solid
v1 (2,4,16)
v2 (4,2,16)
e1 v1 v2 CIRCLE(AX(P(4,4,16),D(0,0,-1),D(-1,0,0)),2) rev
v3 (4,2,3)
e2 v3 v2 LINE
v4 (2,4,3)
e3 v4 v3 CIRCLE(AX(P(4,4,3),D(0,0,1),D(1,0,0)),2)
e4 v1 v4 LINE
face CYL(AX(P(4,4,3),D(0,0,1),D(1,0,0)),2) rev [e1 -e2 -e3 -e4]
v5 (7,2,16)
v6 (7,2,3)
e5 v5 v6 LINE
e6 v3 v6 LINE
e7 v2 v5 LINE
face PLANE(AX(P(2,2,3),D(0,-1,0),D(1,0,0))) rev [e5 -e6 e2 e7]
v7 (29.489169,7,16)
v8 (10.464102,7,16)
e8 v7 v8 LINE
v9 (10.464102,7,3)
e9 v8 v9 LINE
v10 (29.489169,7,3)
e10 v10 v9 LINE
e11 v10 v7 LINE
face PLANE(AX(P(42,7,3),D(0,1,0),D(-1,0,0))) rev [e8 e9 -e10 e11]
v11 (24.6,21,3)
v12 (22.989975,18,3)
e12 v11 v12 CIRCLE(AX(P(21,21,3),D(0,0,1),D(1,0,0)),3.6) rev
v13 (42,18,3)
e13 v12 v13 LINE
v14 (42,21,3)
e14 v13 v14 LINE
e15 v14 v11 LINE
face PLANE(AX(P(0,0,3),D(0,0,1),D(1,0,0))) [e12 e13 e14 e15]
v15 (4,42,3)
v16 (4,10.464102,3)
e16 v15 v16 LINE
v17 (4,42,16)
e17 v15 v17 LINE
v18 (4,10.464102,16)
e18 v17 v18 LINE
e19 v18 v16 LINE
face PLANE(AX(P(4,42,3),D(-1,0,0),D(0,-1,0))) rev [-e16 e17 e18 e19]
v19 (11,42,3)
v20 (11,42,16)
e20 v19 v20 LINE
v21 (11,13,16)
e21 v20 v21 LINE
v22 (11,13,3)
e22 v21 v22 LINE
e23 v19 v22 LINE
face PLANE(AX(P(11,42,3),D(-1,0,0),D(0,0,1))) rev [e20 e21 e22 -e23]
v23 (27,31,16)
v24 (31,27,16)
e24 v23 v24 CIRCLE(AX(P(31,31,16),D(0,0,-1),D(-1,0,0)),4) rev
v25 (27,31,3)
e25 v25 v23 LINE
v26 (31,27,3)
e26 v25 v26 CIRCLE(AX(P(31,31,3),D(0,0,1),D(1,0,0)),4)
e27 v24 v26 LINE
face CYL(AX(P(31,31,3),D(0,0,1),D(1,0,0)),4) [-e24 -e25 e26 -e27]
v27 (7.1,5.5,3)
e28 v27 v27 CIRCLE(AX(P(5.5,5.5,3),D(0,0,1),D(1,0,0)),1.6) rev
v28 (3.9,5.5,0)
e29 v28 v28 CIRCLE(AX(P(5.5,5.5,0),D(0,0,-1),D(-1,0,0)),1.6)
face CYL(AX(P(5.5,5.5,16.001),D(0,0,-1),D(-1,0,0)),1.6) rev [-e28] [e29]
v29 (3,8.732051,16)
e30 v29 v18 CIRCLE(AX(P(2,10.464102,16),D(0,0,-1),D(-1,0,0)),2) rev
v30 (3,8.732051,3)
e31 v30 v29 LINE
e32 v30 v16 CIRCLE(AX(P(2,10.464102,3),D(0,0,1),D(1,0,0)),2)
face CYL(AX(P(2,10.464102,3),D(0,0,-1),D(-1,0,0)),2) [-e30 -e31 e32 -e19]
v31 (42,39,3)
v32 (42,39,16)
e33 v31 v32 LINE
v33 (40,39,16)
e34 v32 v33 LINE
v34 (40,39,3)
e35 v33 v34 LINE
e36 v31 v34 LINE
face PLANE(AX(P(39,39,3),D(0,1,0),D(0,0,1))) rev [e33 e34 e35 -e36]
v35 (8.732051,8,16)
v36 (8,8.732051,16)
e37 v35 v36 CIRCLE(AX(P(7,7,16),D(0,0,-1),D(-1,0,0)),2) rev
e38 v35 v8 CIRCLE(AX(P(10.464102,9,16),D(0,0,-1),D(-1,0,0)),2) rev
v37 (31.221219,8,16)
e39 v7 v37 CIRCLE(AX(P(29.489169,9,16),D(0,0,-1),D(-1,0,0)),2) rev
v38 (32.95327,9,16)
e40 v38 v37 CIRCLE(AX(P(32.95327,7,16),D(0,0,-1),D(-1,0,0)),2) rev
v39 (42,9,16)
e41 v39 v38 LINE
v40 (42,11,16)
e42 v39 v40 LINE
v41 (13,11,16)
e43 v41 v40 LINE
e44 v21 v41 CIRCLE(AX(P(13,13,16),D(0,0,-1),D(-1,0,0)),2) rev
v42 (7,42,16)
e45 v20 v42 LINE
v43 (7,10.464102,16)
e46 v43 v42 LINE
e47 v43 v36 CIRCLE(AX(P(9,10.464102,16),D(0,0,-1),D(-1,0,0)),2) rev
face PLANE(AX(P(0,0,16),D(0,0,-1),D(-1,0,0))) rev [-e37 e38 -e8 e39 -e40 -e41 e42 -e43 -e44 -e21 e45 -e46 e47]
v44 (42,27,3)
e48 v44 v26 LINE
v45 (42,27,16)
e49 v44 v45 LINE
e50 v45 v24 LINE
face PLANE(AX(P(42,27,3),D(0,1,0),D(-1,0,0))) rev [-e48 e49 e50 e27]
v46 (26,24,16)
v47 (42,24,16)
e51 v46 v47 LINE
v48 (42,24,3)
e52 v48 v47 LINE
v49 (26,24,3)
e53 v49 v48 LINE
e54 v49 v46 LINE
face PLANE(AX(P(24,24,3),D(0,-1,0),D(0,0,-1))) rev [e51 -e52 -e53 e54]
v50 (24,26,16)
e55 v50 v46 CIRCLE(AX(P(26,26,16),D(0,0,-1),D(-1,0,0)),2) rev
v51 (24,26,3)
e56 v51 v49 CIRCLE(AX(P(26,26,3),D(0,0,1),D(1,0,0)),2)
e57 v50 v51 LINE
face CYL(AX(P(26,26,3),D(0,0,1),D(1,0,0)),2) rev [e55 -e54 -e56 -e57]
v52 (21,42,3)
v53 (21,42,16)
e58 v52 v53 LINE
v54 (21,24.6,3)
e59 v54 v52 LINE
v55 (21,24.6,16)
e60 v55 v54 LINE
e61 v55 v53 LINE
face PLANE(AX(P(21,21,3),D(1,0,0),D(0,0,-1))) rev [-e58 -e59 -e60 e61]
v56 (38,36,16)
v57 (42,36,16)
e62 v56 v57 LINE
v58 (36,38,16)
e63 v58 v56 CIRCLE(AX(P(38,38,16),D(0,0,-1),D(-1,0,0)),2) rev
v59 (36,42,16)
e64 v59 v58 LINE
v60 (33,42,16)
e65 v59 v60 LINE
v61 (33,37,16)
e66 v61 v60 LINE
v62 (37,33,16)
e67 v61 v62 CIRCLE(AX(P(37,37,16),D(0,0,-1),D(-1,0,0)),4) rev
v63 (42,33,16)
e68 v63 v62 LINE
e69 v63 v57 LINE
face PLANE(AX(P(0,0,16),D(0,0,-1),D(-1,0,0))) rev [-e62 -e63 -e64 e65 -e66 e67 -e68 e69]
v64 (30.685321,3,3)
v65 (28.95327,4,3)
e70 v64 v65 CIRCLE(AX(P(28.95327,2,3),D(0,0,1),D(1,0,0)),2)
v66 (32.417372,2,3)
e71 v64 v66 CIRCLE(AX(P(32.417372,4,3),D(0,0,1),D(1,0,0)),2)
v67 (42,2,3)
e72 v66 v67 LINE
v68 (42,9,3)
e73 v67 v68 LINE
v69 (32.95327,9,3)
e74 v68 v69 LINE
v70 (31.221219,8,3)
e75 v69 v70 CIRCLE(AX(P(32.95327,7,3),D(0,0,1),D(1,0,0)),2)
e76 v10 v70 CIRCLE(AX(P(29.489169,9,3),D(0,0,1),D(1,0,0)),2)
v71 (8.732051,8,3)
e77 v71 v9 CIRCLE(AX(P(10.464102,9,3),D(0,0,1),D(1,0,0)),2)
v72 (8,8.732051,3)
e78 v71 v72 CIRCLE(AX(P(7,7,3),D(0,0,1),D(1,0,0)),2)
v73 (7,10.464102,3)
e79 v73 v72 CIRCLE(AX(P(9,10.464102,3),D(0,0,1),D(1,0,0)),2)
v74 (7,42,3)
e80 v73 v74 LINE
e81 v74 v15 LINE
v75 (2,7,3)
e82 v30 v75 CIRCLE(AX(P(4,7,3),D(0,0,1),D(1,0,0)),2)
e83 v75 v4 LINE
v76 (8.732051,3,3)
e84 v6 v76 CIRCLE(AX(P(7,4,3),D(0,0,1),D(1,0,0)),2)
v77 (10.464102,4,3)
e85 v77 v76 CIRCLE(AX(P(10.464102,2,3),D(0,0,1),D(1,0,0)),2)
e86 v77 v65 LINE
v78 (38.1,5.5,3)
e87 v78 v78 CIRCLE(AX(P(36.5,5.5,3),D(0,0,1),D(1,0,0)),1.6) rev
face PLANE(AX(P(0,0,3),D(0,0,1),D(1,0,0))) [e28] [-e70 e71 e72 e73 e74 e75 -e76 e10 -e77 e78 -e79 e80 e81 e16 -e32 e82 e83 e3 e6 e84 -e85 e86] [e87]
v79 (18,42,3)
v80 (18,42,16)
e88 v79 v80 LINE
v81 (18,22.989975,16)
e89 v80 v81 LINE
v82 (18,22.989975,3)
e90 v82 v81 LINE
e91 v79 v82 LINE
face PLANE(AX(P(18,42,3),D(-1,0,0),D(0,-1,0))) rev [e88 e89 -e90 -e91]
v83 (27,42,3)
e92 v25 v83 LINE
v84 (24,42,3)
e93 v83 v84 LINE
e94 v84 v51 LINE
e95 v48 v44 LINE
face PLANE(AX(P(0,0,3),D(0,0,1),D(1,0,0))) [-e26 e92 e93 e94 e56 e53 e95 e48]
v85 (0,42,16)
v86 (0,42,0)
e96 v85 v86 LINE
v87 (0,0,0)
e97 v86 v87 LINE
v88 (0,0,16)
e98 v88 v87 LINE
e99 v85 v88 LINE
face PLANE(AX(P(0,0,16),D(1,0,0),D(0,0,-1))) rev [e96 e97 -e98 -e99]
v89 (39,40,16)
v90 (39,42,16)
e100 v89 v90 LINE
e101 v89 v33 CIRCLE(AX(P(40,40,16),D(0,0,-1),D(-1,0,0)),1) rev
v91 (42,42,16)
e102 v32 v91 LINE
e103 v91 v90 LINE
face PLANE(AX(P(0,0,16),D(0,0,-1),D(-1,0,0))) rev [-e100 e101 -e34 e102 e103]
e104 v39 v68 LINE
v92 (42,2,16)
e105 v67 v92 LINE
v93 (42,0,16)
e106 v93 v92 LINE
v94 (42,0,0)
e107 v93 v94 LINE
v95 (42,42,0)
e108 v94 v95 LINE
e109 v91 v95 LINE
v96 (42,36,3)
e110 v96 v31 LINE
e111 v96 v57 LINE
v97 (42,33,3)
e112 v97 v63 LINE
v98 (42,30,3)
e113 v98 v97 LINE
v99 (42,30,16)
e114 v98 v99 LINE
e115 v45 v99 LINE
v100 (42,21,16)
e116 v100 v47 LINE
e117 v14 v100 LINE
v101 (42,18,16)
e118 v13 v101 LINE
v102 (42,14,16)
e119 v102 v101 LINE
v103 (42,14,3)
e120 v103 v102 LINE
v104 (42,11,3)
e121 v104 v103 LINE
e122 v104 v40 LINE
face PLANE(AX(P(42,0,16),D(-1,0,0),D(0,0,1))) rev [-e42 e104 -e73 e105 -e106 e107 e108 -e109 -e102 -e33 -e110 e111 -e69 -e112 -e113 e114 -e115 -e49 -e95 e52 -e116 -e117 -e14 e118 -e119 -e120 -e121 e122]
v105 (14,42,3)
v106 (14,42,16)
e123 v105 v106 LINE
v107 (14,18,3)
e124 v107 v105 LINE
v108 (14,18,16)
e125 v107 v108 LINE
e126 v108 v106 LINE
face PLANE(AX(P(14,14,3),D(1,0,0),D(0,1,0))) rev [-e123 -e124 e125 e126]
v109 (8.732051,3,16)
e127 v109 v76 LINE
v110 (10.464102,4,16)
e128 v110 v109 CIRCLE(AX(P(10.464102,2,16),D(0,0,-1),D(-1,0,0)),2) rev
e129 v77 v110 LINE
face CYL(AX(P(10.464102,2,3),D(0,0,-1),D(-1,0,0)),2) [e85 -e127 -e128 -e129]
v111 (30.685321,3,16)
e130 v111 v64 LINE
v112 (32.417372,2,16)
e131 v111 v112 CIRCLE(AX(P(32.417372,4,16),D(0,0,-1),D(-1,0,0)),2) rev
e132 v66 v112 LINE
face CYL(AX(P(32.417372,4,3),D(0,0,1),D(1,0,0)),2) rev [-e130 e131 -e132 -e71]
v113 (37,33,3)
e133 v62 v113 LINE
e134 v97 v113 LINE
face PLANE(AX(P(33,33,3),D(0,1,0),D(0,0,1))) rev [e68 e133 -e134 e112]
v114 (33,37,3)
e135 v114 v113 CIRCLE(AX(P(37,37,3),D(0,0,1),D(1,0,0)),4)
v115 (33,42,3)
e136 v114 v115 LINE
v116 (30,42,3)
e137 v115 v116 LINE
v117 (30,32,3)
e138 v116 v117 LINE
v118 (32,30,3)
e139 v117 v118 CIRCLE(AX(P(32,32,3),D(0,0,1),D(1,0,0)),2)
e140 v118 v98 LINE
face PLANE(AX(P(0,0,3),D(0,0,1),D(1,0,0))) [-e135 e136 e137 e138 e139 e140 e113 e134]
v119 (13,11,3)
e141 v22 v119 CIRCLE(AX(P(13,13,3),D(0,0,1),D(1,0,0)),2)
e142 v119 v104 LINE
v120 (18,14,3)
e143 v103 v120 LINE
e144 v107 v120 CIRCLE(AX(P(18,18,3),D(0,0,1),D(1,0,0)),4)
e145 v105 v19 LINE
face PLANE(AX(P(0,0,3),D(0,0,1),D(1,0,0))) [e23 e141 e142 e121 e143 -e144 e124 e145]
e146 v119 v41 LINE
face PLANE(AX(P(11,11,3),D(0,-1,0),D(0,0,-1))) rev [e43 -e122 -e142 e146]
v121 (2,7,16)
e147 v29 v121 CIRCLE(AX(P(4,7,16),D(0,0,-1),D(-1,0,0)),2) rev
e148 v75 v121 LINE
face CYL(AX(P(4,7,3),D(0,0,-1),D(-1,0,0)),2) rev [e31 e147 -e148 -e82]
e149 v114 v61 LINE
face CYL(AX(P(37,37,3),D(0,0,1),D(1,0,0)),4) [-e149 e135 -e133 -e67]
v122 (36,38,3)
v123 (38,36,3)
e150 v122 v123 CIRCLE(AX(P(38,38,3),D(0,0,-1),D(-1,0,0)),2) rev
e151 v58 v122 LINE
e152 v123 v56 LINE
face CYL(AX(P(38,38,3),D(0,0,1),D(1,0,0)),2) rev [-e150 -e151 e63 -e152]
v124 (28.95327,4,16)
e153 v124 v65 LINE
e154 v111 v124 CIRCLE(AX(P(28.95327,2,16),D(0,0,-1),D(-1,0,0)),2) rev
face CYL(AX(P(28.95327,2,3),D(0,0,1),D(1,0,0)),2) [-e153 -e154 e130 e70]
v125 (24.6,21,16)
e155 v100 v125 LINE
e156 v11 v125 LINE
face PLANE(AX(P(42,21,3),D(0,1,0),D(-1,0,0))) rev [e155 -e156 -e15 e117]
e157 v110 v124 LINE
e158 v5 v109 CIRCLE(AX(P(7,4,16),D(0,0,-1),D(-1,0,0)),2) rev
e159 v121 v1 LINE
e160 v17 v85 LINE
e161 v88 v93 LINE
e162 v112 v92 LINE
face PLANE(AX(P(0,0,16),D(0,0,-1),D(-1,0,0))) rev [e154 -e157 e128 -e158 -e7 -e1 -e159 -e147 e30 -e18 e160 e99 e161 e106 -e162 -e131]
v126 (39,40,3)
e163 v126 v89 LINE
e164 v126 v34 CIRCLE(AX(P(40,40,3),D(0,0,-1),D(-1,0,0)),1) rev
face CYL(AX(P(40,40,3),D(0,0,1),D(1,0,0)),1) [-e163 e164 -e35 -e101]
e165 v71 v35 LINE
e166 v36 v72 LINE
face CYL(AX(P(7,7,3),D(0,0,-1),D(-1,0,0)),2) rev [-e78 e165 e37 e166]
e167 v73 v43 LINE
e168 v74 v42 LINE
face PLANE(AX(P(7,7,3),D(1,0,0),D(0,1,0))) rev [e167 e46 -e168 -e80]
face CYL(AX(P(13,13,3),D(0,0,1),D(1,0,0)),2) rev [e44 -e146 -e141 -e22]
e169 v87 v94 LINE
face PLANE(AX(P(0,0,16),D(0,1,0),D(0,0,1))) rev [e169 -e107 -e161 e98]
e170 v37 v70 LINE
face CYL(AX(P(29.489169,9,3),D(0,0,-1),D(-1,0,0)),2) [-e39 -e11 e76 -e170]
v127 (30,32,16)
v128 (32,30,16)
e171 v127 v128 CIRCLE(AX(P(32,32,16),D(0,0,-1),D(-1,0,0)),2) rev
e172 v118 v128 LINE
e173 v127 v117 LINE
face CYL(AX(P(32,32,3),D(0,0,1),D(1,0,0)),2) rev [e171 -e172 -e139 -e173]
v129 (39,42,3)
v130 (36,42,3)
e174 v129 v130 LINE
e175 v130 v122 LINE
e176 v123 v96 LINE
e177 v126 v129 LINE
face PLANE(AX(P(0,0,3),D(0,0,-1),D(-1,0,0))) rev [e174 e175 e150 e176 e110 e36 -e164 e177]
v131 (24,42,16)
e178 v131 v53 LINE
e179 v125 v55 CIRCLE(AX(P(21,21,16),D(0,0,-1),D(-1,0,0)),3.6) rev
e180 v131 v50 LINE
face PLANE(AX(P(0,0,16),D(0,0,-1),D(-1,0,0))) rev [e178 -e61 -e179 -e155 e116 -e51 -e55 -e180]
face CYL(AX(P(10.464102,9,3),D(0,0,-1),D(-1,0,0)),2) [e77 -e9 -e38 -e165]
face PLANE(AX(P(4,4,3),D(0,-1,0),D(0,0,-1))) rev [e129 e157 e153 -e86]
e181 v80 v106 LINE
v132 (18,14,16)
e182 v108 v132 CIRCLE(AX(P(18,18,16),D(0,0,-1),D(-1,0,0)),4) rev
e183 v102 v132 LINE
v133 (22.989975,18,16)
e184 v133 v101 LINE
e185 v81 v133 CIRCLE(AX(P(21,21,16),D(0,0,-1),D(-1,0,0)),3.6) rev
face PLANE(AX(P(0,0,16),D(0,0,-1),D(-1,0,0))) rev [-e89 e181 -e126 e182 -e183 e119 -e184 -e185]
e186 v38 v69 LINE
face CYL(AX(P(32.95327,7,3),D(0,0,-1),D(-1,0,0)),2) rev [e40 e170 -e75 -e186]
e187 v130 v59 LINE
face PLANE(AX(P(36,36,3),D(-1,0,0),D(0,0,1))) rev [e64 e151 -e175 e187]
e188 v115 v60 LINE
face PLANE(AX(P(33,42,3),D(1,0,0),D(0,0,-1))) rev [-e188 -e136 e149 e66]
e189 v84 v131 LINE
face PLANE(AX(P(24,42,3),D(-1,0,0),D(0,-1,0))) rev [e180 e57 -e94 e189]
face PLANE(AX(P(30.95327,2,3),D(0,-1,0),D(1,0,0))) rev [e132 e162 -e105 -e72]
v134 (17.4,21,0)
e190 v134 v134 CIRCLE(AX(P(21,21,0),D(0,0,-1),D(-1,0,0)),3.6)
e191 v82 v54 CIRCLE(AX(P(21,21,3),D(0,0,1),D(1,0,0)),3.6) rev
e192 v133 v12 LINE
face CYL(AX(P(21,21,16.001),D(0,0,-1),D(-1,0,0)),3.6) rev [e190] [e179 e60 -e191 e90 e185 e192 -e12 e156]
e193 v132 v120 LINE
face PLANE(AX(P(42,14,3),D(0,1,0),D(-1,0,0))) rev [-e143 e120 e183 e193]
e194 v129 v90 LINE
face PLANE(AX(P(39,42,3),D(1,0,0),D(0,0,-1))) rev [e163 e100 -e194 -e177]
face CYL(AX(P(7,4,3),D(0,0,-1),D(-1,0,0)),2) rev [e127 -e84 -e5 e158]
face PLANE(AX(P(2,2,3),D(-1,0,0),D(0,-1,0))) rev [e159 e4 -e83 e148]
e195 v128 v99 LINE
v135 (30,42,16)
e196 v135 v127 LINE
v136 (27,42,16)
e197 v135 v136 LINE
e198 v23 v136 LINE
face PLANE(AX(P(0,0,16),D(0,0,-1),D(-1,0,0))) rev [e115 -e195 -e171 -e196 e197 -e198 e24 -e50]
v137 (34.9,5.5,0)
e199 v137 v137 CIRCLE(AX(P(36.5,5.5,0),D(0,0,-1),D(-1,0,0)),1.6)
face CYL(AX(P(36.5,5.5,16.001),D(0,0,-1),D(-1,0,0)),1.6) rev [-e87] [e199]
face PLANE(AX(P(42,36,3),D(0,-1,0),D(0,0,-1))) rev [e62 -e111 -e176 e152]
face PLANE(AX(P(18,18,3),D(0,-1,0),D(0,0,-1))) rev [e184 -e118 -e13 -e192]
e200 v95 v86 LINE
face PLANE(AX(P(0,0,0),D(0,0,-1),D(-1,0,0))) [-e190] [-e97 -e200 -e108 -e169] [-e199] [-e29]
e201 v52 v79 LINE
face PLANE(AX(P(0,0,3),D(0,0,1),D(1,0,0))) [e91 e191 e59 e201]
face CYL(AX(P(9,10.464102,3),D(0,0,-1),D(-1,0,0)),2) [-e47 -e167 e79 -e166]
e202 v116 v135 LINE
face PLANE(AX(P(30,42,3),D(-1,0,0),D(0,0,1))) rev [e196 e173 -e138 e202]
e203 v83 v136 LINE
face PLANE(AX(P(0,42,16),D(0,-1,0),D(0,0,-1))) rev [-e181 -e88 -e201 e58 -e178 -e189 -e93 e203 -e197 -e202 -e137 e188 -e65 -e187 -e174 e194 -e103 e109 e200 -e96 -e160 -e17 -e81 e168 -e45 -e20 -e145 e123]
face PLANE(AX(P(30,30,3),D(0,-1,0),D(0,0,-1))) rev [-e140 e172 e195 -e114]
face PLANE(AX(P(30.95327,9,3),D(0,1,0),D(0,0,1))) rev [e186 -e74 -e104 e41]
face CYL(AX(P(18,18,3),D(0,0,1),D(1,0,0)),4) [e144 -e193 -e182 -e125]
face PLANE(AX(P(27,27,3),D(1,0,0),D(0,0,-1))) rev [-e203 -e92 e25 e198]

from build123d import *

# Parameters (mm, degrees)
SKETCH1_W           = 42
SKETCH1_H           = 42
BOSS_EXTRUDE1_DEPTH = 16
CUT_EXTRUDE2_DEPTH  = 13
FILLET2_R           = 1
FILLET3_R           = 4
FILLET4_R           = 4
FILLET6_R           = 4
FILLET8_R           = 2
FILLET9_R           = 2
FILLET11_R          = 2
FILLET12_R          = 2
FILLET13_R          = 2
CUT_EXTRUDE3_REACH  = 63.514
SKETCH4_R           = 1.6
SKETCH4_R_2         = 3.6
SKETCH5_W           = 11.093459678
SKETCH5_H           = 7
SKETCH5_W_2         = 7
CUT_EXTRUDE14_DEPTH = 13
FILLET14_R          = 2
FILLET15_R          = 2
FILLET16_R          = 2
FILLET17_R          = 2
FILLET18_R          = 2
FILLET19_R          = 2
FILLET20_R          = 2
FILLET21_R          = 2
FILLET22_R          = 2
FILLET23_R          = 2
FILLET24_R          = 2
FILLET25_R          = 2
FILLET26_R          = 2


with BuildPart() as part:
    # Sketch1 → Boss-Extrude1 (new body)
    with BuildSketch(Plane.XY):
        with Locations((21, 21)):
            Rectangle(SKETCH1_W, SKETCH1_H)
    extrude(amount=BOSS_EXTRUDE1_DEPTH)

    # Sketch3 → Cut-Extrude2 (cut)
    with BuildSketch(Plane.XY.offset(16)):
        Polygon((39, 42), (39, 39), (42, 39), (42, 36), (36, 36), (36, 42), align=None)
        Polygon((33, 42), (33, 33), (42, 33), (42, 30), (30, 30), (30, 42), align=None)
        Polygon((42, 27), (27, 27), (27, 42), (24, 42), (24, 24), (42, 24), align=None)
        Polygon((42, 21), (21, 21), (21, 42), (18, 42), (18, 18), (42, 18), align=None)
        Polygon((42, 14), (14, 14), (14, 42), (11, 42), (11, 11), (42, 11), align=None)
        Polygon((42, 7), (7, 7), (7, 42), (4, 42), (4, 4), (42, 4), align=None)
    extrude(amount=-CUT_EXTRUDE2_DEPTH, mode=Mode.SUBTRACT)

    # Fillet2
    fillet2_edges = [part.edges().sort_by_distance(p)[0] for p in [
        (39, 39, 9.5),
    ]]
    fillet(fillet2_edges, radius=FILLET2_R)

    # Fillet3
    fillet3_edges = [part.edges().sort_by_distance(p)[0] for p in [
        (33, 33, 9.5),
    ]]
    fillet(fillet3_edges, radius=FILLET3_R)

    # Fillet4
    fillet4_edges = [part.edges().sort_by_distance(p)[0] for p in [
        (27, 27, 9.5),
    ]]
    fillet(fillet4_edges, radius=FILLET4_R)

    # Fillet6
    fillet6_edges = [part.edges().sort_by_distance(p)[0] for p in [
        (14, 14, 9.5),
    ]]
    fillet(fillet6_edges, radius=FILLET6_R)

    # Fillet8
    fillet8_edges = [part.edges().sort_by_distance(p)[0] for p in [
        (36, 36, 9.5),
    ]]
    fillet(fillet8_edges, radius=FILLET8_R)

    # Fillet9
    fillet9_edges = [part.edges().sort_by_distance(p)[0] for p in [
        (30, 30, 9.5),
    ]]
    fillet(fillet9_edges, radius=FILLET9_R)

    # Fillet11
    fillet11_edges = [part.edges().sort_by_distance(p)[0] for p in [
        (18, 18, 9.5),
    ]]
    fillet(fillet11_edges, radius=FILLET11_R)

    # Fillet12
    fillet12_edges = [part.edges().sort_by_distance(p)[0] for p in [
        (11, 11, 9.5),
    ]]
    fillet(fillet12_edges, radius=FILLET12_R)

    # Fillet13
    fillet13_edges = [part.edges().sort_by_distance(p)[0] for p in [
        (4, 4, 9.5),
    ]]
    fillet(fillet13_edges, radius=FILLET13_R)

    # Sketch4 → Cut-Extrude3 (cut, up to next)
    with BuildSketch(Plane(origin=(0, 0, 0), x_dir=(-1, 0, 0), z_dir=(0, 0, -1)), mode=Mode.PRIVATE) as cut_extrude3_sk1:
        with Locations((-36.5, 5.5)):
            Circle(SKETCH4_R)
    cut_extrude3_tool1 = extrude(cut_extrude3_sk1.sketch, amount=-CUT_EXTRUDE3_REACH, mode=Mode.PRIVATE) & part.part
    # Sketch4 → Cut-Extrude3 (cut, up to next)
    with BuildSketch(Plane(origin=(0, 0, 0), x_dir=(-1, 0, 0), z_dir=(0, 0, -1)), mode=Mode.PRIVATE) as cut_extrude3_sk2:
        with Locations((-5.5, 5.5)):
            Circle(SKETCH4_R)
    cut_extrude3_tool2 = extrude(cut_extrude3_sk2.sketch, amount=-CUT_EXTRUDE3_REACH, mode=Mode.PRIVATE) & part.part
    # Sketch4 → Cut-Extrude3 (cut, up to next)
    with BuildSketch(Plane(origin=(0, 0, 0), x_dir=(-1, 0, 0), z_dir=(0, 0, -1)), mode=Mode.PRIVATE) as cut_extrude3_sk3:
        with Locations((-21, 21)):
            Circle(SKETCH4_R_2)
    cut_extrude3_tool3 = extrude(cut_extrude3_sk3.sketch, amount=-CUT_EXTRUDE3_REACH, mode=Mode.PRIVATE) & part.part
    add(cut_extrude3_tool1.solids().sort_by_distance((36.5, 5.5, 0))[0], mode=Mode.SUBTRACT)
    add(cut_extrude3_tool2.solids().sort_by_distance((5.5, 5.5, 0))[0], mode=Mode.SUBTRACT)
    add(cut_extrude3_tool3.solids().sort_by_distance((21, 21, 0))[0], mode=Mode.SUBTRACT)

    # Sketch5 → Cut-Extrude14 (cut)
    with BuildSketch(Plane.XY.offset(16)):
        with Locations((36.5, 5.5)):
            Rectangle(SKETCH5_W, SKETCH5_H)
        with Locations((5.5, 5.5)):
            Rectangle(SKETCH5_W_2, SKETCH5_H)
    extrude(amount=-CUT_EXTRUDE14_DEPTH, mode=Mode.SUBTRACT)

    # Fillet14
    fillet14_edges = [part.edges().sort_by_distance(p)[0] for p in [
        (24, 24, 9.5),
    ]]
    fillet(fillet14_edges, radius=FILLET14_R)

    # Fillet15
    fillet15_edges = [part.edges().sort_by_distance(p)[0] for p in [
        (9, 2, 9.5),
    ]]
    fillet(fillet15_edges, radius=FILLET15_R - 0.0001)  # a hair under: the kernel refuses the full size

    # Fillet16
    fillet16_edges = [part.edges().sort_by_distance(p)[0] for p in [
        (2, 2, 9.5),
    ]]
    fillet(fillet16_edges, radius=FILLET16_R)

    # Fillet17
    fillet17_edges = [part.edges().sort_by_distance(p)[0] for p in [
        (2, 9, 9.5),
    ]]
    fillet(fillet17_edges, radius=FILLET17_R - 0.0001)  # a hair under: the kernel refuses the full size

    # Fillet18
    fillet18_edges = [part.edges().sort_by_distance(p)[0] for p in [
        (9, 9, 9.5),
    ]]
    fillet(fillet18_edges, radius=FILLET18_R - 0.0001)  # a hair under: the kernel refuses the full size

    # Fillet19
    fillet19_edges = [part.edges().sort_by_distance(p)[0] for p in [
        (4, 9, 9.5),
    ]]
    fillet(fillet19_edges, radius=FILLET19_R)

    # Fillet20
    fillet20_edges = [part.edges().sort_by_distance(p)[0] for p in [
        (7, 9, 9.5),
    ]]
    fillet(fillet20_edges, radius=FILLET20_R)

    # Fillet21
    fillet21_edges = [part.edges().sort_by_distance(p)[0] for p in [
        (9, 7, 9.5),
    ]]
    fillet(fillet21_edges, radius=FILLET21_R)

    # Fillet22
    fillet22_edges = [part.edges().sort_by_distance(p)[0] for p in [
        (9, 4, 9.5),
    ]]
    fillet(fillet22_edges, radius=FILLET22_R)

    # Fillet23
    fillet23_edges = [part.edges().sort_by_distance(p)[0] for p in [
        (30.953270161, 9, 9.5),
    ]]
    fillet(fillet23_edges, radius=FILLET23_R - 0.0001)  # a hair under: the kernel refuses the full size

    # Fillet24
    fillet24_edges = [part.edges().sort_by_distance(p)[0] for p in [
        (30.953270161, 7, 9.5),
    ]]
    fillet(fillet24_edges, radius=FILLET24_R)

    # Fillet25
    fillet25_edges = [part.edges().sort_by_distance(p)[0] for p in [
        (30.953270161, 4, 9.5),
    ]]
    fillet(fillet25_edges, radius=FILLET25_R - 0.0001)  # a hair under: the kernel refuses the full size

    # Fillet26
    fillet26_edges = [part.edges().sort_by_distance(p)[0] for p in [
        (30.953270161, 2, 9.5),
    ]]
    fillet(fillet26_edges, radius=FILLET26_R)


solid = part.part
